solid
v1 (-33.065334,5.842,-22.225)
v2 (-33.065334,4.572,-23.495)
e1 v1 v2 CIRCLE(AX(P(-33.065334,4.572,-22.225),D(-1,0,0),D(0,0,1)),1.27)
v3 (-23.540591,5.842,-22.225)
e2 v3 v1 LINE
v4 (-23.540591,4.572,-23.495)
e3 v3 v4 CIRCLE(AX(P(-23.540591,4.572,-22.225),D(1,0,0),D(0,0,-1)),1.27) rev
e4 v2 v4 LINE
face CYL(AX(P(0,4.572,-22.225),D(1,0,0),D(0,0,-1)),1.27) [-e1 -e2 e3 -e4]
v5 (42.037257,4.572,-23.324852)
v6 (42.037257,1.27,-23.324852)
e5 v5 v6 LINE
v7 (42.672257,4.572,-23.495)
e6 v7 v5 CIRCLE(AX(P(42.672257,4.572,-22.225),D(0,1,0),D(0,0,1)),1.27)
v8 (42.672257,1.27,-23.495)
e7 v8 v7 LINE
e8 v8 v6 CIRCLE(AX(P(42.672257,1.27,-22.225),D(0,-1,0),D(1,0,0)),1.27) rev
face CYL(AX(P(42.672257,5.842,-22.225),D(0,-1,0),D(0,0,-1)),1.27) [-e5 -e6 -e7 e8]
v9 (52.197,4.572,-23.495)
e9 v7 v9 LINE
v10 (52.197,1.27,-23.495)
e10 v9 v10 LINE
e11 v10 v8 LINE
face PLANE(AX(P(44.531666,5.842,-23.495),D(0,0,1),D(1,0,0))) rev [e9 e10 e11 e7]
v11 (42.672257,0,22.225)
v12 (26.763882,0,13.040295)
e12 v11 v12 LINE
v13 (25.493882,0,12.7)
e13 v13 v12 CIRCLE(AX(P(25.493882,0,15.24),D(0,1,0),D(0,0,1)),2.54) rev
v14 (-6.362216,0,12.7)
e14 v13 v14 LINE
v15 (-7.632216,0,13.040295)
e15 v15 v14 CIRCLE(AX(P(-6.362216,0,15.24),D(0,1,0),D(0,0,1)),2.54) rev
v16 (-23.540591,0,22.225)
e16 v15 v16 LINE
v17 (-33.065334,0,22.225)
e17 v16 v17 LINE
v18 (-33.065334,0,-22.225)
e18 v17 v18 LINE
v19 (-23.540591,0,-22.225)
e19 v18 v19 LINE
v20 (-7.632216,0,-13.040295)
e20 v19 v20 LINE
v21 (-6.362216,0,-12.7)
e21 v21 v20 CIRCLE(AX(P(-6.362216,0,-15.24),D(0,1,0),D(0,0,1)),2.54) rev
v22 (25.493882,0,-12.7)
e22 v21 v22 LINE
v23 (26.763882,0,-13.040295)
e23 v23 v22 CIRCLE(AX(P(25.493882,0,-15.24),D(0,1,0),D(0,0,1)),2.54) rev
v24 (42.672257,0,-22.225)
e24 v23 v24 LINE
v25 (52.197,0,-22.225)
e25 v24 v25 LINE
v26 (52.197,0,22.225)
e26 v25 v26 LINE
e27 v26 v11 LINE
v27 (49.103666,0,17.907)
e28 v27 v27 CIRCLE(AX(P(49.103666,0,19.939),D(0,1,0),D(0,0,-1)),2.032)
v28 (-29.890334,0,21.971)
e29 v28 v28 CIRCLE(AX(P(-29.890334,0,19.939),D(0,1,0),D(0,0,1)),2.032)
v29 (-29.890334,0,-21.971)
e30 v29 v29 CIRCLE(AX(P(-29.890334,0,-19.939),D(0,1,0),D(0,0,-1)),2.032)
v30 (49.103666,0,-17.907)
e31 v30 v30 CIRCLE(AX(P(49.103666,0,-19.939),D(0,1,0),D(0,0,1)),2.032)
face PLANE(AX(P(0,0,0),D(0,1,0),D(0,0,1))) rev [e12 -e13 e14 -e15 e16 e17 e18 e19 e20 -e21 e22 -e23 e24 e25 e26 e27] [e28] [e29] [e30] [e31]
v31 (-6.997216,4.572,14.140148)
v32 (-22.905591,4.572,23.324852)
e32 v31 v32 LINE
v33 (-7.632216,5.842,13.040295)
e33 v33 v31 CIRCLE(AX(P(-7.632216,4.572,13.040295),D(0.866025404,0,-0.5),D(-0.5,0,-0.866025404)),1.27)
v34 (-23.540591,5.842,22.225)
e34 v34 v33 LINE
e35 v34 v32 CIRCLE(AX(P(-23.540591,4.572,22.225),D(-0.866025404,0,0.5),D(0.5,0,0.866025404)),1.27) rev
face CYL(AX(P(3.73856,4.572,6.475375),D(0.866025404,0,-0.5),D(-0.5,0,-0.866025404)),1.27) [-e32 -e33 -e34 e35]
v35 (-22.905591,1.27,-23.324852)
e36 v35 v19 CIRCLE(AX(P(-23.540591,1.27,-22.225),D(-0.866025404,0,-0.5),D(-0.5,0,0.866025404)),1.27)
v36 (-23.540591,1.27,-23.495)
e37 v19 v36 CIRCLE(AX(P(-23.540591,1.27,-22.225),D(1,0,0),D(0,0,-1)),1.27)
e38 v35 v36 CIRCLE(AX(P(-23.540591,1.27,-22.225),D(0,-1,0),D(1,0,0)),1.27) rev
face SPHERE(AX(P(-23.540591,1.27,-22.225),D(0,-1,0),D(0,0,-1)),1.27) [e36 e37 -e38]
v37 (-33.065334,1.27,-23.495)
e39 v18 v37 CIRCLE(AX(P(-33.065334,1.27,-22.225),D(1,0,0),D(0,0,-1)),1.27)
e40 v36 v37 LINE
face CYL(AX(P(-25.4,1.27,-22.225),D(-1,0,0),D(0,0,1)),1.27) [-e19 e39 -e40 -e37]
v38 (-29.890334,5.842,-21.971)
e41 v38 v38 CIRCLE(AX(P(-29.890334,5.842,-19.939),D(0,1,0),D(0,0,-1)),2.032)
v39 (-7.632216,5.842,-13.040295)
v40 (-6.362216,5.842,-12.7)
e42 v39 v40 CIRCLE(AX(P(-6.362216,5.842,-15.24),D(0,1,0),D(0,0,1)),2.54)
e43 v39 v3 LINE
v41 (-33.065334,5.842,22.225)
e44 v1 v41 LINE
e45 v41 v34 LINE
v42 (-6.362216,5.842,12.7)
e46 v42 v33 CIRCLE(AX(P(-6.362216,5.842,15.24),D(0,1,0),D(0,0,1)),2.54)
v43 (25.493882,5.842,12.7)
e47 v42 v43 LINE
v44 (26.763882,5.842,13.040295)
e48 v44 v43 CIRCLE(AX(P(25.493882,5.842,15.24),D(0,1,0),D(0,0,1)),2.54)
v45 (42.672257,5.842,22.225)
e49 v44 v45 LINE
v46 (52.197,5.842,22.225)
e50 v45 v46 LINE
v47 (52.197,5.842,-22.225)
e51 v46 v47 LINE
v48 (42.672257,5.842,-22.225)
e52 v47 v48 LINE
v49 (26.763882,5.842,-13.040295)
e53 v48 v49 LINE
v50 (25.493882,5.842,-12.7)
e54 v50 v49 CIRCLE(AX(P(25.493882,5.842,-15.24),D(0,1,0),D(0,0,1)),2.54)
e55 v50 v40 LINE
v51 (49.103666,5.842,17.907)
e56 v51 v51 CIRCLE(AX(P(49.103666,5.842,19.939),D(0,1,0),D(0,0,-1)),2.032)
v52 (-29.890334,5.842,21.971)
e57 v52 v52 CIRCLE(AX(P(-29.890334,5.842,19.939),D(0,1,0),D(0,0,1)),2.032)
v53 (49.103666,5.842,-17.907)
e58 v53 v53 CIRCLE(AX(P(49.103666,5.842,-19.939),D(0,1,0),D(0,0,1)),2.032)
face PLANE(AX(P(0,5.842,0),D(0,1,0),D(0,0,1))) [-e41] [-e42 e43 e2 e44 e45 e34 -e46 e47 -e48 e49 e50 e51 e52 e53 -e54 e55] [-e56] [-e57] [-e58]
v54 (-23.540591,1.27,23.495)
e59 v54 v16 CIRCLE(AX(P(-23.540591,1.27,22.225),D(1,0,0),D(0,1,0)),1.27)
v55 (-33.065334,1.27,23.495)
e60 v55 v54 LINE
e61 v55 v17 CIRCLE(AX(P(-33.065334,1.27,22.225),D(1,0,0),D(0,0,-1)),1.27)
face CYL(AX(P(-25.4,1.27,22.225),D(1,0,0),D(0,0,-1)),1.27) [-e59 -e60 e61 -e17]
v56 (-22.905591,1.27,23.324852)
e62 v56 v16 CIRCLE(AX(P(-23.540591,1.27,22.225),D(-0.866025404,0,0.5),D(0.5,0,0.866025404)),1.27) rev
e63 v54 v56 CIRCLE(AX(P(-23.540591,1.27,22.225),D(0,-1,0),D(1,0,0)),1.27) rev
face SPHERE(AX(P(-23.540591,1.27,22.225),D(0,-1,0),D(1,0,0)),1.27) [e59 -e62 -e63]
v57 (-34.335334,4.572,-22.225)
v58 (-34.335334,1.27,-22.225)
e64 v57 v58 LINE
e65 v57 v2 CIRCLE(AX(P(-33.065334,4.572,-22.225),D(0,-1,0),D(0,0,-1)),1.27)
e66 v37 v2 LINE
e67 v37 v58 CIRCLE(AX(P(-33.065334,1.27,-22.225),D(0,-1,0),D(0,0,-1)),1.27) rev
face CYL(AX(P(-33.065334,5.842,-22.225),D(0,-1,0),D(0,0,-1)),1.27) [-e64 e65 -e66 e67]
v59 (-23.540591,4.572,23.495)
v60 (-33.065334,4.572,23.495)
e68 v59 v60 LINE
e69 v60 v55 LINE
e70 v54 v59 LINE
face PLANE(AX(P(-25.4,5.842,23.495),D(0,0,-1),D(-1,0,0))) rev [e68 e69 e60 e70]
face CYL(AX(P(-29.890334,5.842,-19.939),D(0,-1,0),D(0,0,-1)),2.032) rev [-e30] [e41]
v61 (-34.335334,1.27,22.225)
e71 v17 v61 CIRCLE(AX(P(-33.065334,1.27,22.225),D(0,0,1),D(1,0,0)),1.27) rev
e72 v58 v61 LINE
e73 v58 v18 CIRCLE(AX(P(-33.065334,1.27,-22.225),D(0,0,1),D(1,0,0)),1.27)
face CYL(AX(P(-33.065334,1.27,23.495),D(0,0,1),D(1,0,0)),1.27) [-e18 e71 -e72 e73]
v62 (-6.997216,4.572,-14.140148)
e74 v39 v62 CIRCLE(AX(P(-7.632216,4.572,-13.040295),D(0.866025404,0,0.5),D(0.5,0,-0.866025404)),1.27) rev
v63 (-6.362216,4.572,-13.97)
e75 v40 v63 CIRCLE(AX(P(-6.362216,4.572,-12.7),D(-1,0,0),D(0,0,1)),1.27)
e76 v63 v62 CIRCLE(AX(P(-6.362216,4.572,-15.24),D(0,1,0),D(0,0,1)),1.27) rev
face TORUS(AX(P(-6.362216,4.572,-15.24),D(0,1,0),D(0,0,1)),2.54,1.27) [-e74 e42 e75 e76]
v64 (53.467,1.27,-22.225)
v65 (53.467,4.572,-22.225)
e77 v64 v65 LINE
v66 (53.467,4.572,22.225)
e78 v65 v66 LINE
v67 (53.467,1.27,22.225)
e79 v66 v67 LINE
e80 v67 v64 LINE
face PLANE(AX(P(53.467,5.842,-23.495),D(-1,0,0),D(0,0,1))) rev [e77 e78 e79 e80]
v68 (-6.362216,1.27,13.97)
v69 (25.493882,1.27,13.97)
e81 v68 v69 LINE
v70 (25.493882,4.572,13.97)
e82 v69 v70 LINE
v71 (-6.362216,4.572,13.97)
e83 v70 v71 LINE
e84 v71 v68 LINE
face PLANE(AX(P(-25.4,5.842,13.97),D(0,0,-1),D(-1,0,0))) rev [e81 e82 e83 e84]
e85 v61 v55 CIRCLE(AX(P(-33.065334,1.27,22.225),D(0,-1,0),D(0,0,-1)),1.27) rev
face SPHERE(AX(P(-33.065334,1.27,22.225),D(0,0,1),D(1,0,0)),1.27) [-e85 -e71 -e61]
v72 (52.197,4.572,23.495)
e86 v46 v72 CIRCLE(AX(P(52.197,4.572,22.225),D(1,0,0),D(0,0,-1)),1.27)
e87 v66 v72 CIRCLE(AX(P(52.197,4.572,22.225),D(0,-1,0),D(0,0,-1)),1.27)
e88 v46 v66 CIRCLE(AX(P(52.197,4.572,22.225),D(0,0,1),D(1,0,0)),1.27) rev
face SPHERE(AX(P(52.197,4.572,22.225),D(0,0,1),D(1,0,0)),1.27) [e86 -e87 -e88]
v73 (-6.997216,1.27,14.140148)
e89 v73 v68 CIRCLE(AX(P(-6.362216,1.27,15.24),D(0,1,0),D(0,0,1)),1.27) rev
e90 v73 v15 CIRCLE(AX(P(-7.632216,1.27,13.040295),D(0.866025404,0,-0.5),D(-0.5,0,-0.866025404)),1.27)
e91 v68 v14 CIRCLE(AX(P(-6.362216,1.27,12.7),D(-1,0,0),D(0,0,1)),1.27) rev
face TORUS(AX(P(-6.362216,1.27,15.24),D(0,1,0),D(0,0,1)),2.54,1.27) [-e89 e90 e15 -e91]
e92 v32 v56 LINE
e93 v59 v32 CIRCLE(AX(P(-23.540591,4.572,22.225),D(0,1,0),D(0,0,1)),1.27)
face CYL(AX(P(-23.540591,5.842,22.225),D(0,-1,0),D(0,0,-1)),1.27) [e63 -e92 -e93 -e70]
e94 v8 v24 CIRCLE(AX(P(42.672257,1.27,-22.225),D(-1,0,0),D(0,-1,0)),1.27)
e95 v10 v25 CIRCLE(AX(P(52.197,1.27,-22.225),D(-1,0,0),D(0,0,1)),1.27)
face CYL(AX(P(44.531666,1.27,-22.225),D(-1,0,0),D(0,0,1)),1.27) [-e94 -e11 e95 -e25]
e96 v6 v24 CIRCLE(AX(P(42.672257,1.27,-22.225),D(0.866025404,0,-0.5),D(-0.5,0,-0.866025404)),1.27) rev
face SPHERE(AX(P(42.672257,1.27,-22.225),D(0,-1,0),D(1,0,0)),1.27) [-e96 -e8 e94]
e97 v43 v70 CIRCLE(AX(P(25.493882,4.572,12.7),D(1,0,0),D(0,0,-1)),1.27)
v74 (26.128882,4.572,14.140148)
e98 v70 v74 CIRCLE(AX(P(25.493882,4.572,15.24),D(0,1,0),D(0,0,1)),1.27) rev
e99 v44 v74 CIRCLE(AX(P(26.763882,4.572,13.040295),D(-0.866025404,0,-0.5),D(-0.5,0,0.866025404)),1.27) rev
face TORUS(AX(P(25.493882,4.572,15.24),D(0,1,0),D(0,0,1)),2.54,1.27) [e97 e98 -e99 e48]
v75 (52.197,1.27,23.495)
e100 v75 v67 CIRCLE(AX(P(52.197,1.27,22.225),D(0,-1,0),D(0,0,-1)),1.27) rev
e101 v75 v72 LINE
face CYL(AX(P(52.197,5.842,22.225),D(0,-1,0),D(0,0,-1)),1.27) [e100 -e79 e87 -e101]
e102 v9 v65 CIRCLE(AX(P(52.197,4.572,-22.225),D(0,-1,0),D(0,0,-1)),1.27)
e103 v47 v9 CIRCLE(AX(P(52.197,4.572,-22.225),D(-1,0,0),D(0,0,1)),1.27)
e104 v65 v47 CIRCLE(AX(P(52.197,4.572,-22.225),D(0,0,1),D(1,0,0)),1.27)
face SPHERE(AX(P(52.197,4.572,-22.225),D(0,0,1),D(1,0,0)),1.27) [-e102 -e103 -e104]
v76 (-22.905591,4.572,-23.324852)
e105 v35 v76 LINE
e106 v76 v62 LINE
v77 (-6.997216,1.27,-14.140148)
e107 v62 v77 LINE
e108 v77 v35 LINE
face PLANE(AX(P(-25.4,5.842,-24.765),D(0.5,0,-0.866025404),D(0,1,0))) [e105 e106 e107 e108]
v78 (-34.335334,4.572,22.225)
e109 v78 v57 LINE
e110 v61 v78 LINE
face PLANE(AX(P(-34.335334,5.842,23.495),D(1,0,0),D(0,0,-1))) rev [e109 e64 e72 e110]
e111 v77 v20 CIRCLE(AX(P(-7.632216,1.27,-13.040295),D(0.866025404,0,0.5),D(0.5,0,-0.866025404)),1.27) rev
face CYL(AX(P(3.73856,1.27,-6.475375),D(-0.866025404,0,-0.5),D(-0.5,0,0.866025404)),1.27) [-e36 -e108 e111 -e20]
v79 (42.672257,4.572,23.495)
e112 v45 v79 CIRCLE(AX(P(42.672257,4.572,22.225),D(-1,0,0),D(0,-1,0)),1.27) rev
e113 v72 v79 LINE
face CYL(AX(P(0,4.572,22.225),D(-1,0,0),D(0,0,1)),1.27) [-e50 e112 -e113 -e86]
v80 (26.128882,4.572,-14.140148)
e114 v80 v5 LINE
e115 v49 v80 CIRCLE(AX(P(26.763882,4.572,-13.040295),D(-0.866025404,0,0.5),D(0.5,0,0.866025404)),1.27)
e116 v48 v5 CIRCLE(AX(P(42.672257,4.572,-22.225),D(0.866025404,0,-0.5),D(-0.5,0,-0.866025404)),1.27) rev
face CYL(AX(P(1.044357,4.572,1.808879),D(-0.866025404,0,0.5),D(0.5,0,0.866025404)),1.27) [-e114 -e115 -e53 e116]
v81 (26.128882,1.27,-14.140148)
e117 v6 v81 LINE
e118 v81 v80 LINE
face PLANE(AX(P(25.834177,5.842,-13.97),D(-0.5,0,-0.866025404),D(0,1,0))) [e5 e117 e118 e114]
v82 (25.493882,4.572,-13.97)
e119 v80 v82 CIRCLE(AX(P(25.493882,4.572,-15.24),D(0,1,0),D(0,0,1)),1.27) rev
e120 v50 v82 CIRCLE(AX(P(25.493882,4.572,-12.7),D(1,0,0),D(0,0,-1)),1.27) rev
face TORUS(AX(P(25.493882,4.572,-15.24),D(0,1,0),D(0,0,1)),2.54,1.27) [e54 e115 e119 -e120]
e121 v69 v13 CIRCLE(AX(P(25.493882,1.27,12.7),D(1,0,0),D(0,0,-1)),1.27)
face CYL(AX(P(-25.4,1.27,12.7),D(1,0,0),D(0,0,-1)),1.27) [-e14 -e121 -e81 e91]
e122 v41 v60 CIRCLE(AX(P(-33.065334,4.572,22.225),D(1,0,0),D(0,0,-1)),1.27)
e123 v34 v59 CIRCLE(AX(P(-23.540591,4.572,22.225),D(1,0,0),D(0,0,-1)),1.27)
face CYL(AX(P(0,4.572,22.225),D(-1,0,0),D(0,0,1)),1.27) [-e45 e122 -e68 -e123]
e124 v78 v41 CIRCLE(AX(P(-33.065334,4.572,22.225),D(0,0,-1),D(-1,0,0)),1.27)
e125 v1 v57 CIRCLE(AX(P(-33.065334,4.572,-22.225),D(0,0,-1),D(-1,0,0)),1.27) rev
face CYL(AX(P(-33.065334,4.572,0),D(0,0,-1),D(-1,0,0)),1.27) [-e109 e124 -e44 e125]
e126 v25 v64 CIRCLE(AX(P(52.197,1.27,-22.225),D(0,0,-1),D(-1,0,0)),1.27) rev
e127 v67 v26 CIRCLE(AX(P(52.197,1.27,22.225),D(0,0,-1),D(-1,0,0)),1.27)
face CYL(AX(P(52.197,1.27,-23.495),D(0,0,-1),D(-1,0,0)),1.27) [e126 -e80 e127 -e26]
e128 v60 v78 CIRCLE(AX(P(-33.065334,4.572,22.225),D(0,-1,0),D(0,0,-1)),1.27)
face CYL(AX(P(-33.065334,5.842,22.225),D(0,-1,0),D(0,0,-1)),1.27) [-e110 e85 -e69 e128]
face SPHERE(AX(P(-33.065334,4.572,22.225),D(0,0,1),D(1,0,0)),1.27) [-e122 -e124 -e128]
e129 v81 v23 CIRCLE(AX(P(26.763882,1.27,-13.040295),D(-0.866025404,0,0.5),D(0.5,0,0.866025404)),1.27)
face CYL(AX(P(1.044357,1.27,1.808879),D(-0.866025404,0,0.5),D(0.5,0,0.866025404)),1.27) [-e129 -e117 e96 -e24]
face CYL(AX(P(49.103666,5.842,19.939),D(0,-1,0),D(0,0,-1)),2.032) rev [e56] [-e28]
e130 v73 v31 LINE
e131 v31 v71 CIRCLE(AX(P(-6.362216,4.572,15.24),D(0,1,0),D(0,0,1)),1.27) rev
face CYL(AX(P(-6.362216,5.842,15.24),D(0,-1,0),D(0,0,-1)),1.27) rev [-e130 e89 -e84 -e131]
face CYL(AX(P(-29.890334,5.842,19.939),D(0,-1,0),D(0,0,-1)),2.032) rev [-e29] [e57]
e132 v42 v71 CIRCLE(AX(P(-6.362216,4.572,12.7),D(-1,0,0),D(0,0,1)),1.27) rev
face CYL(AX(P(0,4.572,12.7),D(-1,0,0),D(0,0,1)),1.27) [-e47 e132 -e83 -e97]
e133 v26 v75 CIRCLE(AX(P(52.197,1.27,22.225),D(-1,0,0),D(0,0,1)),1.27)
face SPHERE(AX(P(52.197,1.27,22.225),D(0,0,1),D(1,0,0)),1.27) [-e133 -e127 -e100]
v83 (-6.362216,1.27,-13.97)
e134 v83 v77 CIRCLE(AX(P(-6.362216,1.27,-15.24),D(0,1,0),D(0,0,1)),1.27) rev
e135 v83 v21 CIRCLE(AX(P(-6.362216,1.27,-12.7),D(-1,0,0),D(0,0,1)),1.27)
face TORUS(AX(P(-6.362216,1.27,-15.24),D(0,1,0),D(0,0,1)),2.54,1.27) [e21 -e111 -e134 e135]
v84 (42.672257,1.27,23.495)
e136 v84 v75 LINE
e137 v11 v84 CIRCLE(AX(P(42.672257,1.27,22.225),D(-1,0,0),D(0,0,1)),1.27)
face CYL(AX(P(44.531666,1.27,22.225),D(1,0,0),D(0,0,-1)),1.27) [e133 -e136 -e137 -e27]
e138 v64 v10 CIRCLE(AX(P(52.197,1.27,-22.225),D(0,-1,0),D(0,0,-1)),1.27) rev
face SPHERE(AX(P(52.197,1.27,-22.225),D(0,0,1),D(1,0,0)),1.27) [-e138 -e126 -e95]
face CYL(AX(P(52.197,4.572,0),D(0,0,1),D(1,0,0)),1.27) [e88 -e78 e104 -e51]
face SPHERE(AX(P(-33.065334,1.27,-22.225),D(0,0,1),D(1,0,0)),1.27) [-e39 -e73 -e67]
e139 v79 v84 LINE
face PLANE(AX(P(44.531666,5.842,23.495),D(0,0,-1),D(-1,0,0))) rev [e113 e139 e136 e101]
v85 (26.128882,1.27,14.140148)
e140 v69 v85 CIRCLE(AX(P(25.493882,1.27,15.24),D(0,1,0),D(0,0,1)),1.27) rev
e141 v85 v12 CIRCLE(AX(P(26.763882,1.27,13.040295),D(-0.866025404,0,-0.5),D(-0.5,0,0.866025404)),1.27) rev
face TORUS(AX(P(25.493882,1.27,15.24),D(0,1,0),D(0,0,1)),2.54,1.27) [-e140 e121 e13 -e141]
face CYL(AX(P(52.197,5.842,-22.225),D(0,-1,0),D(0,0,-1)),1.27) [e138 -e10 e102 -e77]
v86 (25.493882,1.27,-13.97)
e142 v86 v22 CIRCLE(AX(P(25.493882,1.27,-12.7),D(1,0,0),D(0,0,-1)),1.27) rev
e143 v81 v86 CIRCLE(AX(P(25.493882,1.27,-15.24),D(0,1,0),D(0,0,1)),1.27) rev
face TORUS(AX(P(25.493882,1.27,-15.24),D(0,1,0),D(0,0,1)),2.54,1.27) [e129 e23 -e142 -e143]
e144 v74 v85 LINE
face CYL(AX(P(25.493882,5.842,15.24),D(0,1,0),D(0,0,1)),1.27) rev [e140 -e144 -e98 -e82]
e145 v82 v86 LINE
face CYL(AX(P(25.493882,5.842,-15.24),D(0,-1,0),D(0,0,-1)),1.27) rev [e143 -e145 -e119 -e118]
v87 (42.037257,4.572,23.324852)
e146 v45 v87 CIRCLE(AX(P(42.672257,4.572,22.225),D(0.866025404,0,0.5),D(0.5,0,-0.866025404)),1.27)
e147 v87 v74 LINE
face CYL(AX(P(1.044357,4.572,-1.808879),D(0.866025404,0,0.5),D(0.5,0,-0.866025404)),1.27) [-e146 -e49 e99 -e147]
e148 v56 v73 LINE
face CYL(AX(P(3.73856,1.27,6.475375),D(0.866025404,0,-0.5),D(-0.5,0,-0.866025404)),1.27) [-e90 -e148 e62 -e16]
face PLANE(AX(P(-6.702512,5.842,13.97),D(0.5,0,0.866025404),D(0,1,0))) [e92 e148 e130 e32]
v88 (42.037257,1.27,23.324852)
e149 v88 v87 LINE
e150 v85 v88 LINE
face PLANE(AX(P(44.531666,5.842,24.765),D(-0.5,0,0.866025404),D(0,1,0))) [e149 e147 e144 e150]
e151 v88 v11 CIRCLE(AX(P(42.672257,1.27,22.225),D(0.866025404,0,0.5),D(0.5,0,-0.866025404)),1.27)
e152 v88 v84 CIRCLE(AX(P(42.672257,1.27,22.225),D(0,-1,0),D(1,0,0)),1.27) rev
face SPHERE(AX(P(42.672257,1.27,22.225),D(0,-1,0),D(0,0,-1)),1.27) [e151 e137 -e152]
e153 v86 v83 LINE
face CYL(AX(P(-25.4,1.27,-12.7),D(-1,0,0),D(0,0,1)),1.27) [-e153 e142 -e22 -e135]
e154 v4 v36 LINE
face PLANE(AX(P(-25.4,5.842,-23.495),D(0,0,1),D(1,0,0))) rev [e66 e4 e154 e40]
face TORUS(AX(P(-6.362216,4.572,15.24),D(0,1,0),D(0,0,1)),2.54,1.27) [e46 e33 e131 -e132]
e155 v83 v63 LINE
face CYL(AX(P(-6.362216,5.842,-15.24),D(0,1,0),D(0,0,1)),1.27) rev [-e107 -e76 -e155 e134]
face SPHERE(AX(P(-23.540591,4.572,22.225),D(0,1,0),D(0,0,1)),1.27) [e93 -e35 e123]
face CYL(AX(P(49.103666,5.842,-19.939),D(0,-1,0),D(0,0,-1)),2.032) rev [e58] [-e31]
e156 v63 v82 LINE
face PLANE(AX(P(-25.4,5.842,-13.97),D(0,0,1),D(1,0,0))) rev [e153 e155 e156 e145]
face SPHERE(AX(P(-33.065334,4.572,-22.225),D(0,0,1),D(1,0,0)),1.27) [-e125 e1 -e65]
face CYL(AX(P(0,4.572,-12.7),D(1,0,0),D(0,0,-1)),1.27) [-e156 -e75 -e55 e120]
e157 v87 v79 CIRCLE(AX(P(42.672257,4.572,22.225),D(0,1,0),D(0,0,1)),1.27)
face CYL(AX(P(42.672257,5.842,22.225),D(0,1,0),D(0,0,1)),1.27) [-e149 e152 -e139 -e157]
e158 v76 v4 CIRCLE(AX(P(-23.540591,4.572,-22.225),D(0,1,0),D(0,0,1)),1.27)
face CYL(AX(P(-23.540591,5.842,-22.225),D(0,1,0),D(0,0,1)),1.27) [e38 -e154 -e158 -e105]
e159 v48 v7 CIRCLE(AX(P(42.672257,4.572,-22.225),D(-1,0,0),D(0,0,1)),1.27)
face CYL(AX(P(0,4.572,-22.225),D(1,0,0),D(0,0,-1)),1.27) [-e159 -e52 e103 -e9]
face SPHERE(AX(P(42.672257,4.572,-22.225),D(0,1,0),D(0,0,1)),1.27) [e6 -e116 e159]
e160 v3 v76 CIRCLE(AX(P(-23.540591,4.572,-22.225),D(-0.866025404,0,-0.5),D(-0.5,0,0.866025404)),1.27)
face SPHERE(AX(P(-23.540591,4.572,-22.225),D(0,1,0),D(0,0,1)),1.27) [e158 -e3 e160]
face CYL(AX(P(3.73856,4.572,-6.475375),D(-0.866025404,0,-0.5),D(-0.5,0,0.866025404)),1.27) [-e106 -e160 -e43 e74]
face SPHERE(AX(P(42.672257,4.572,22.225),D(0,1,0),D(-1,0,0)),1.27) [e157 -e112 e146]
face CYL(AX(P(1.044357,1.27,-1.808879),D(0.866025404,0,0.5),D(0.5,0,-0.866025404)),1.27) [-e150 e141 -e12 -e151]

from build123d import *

# Parameters (mm, degrees)
SKETCH3_R           = 2.032000000000001
BOSS_EXTRUDE1_DEPTH = 5.842
FILLET1_R           = 1.27
CHAMFER1_SIZE       = 18.697488468
CHAMFER1_SIZE_2     = 10.795
FILLET2_R           = 1.27


with BuildPart() as part:
    # Sketch3 → Boss-Extrude1 (new body)
    with BuildSketch(Plane(origin=(0, 0, 0), x_dir=(1, 0, 0), z_dir=(0, 1, 0))):
        Polygon((44.531665591536154, -23.494999999999987), (53.467, -23.49499999999999), (53.467, 23.49499999999999), (44.531665591536154, 23.494999999999987), (44.531665591536154, 13.97), (-25.399999999999977, 13.97), (-25.399999999999977, 23.494999999999997), (-34.33533440846382, 23.494999999999997), (-34.33533440846385, -23.494999999999997), (-25.39999999999999, -23.494999999999997), (-25.39999999999999, -13.97), (44.531665591536154, -13.97), align=None)
        with Locations(Location((49.10366559153615, 19.939, 0), (0, 0, 270))):
            Circle(SKETCH3_R, mode=Mode.SUBTRACT)
        with Locations(Location((49.10366559153615, -19.939, 0), (0, 0, 90))):
            Circle(SKETCH3_R, mode=Mode.SUBTRACT)
        with Locations(Location((-29.890334408463843, -19.939000000000004, 0), (0, 0, 270))):
            Circle(SKETCH3_R, mode=Mode.SUBTRACT)
        with Locations(Location((-29.890334408463843, 19.939000000000004, 0), (0, 0, 90))):
            Circle(SKETCH3_R, mode=Mode.SUBTRACT)
    extrude(amount=BOSS_EXTRUDE1_DEPTH)

    # Fillet1
    fillet1_edges = [part.edges().sort_by_distance(p)[0] for p in [
        (-34.33533440846384, 5.842, 0),
        (53.467, 0, 0),
        (-34.33533440846384, 0, 0),
        (53.467, 2.921, -23.49499999999999),
        (53.467, 2.921, 23.49499999999999),
        (-34.33533440846385, 2.921, 23.494999999999997),
        (-34.33533440846382, 2.921, -23.494999999999997),
        (53.467, 5.842, 0),
    ]]
    fillet(fillet1_edges, radius=FILLET1_R)

    # Chamfer1
    # the kernel refuses this chamfer: 18.697488468, 10.795 mm, written as the material it adds along each edge
    with BuildSketch(Plane(origin=(-25.399999999999977, 0, -13.97), x_dir=(0.999813220622208, 0, 0.019326765612700643), z_dir=(0, 1, 0))) as chamfer1_piece_1_section:
        Polygon((CHAMFER1_SIZE * 0.999813220606, CHAMFER1_SIZE * 0.0193267656124), (-CHAMFER1_SIZE_2 * 0.0193267656127, CHAMFER1_SIZE_2 * 0.999813220622), (0, 0), align=None)
    chamfer1_piece_1 = extrude(amount=5.842, mode=Mode.PRIVATE)
    chamfer1_piece_1 = split(chamfer1_piece_1, bisect_by=Plane(origin=(-18.979428643974416, 2.920999999999999, -23.494999999999997), z_dir=(0, 0, 1)), keep=Keep.TOP, mode=Mode.PRIVATE)
    add(chamfer1_piece_1)
    with BuildSketch(Plane(origin=(44.531665591536154, 0, -13.97), x_dir=(0.05789386240267167, 0, -0.9983227437537926), z_dir=(0, 1, 0))) as chamfer1_piece_2_section:
        Polygon((CHAMFER1_SIZE_2 * 0.998322743754, CHAMFER1_SIZE_2 * 0.0578938624027), (-CHAMFER1_SIZE * 0.0578938624018, CHAMFER1_SIZE * 0.998322743738), (0, 0), align=None)
    chamfer1_piece_2 = extrude(amount=5.842, mode=Mode.PRIVATE)
    chamfer1_piece_2 = split(chamfer1_piece_2, bisect_by=Plane(origin=(38.11109423551069, 2.9210000000000003, -23.494999999999983), z_dir=(4e-16, 0, 1)), keep=Keep.TOP, mode=Mode.PRIVATE)
    add(chamfer1_piece_2)
    with BuildSketch(Plane(origin=(44.531665591536154, 0, 13.97), x_dir=(0.05789386240267167, 0, 0.9983227437537926), z_dir=(0, 1, 0))) as chamfer1_piece_3_section:
        Polygon((CHAMFER1_SIZE_2 * 0.998322743754, -CHAMFER1_SIZE_2 * 0.0578938624027), (-CHAMFER1_SIZE * 0.0578938624018, -CHAMFER1_SIZE * 0.998322743738), (0, 0), align=None)
    chamfer1_piece_3 = extrude(amount=5.842, mode=Mode.PRIVATE)
    chamfer1_piece_3 = split(chamfer1_piece_3, bisect_by=Plane(origin=(38.1110942355107, 2.921, 23.494999999999983), z_dir=(4e-16, 0, -1)), keep=Keep.TOP, mode=Mode.PRIVATE)
    add(chamfer1_piece_3)
    with BuildSketch(Plane(origin=(-25.39999999999999, 0, 13.97), x_dir=(0.999813220622208, 0, -0.019326765612700643), z_dir=(0, 1, 0))) as chamfer1_piece_4_section:
        Polygon((CHAMFER1_SIZE * 0.999813220606, -CHAMFER1_SIZE * 0.0193267656124), (-CHAMFER1_SIZE_2 * 0.0193267656127, -CHAMFER1_SIZE_2 * 0.999813220622), (0, 0), align=None)
    chamfer1_piece_4 = extrude(amount=5.842, mode=Mode.PRIVATE)
    chamfer1_piece_4 = split(chamfer1_piece_4, bisect_by=Plane(origin=(-18.979428643974433, 2.9209999999999985, 23.494999999999997), z_dir=(0, 0, -1)), keep=Keep.TOP, mode=Mode.PRIVATE)
    add(chamfer1_piece_4)

    # Fillet2
    # the kernel refuses this fillet: 1.27 mm, written as the material it adds along each edge
    with BuildSketch(Plane(origin=(25.834177123831726, 0, -13.970000000005081), x_dir=(0.8660254037845168, 0, -0.4999999999998646), z_dir=(0, 1, 0))) as fillet2_piece_1:
        with BuildLine():
            CenterArc((FILLET2_R * 0.267949192431, FILLET2_R), FILLET2_R, 240.00000000000912, 29.999999999991417)
            Line((-FILLET2_R * 0.232050807569, FILLET2_R * 0.133974596215), (0, 0))
            Line((0, 0), (FILLET2_R * 0.267949192431, 0))
        make_face()
    extrude(amount=5.842)
    with BuildSketch(Plane(origin=(-6.702511532303099, 0, -13.969999999994567), x_dir=(1.0, 0, -1.5968110012338276e-11), z_dir=(0, 1, 0))) as fillet2_piece_2:
        with BuildLine():
            CenterArc((FILLET2_R * 0.267949192447, FILLET2_R), FILLET2_R, 239.9999999991839, 29.999999999901206)
            Line((-FILLET2_R * 0.232050807565, FILLET2_R * 0.133974596223), (0, 0))
            Line((0, 0), (FILLET2_R * 0.267949192431, 0))
        make_face()
    extrude(amount=5.842)
    with BuildSketch(Plane(origin=(-6.702511532303099, 0, 13.969999999994567), x_dir=(-0.8660254037842282, 0, 0.5000000000003643), z_dir=(0, 1, 0))) as fillet2_piece_3:
        with BuildLine():
            CenterArc((FILLET2_R * 0.267949192431, FILLET2_R), FILLET2_R, 239.9999999999759, 30.000000000023817)
            Line((-FILLET2_R * 0.232050807569, FILLET2_R * 0.133974596216), (0, 0))
            Line((0, 0), (FILLET2_R * 0.267949192431, -1e-17))
        make_face()
    extrude(amount=5.842)
    with BuildSketch(Plane(origin=(25.834177123831726, 0, 13.970000000005081), x_dir=(-1.0, 0, -1.4929321554540515e-11), z_dir=(0, 1, 0))) as fillet2_piece_4:
        with BuildLine():
            CenterArc((FILLET2_R * 0.267949192416, FILLET2_R), FILLET2_R, 240.00000000074962, 30.00000000010573)
            Line((-FILLET2_R * 0.232050807573, FILLET2_R * 0.133974596209), (0, 0))
            Line((0, 0), (FILLET2_R * 0.267949192431, 0))
        make_face()
    extrude(amount=5.842)
    # the kernel refuses this fillet: 1.27 mm, written as the material it takes off along each edge
    with BuildSketch(Plane(origin=(-33.065334408463855, 4.571999999999999, 22.225), x_dir=(0, 1, 0), z_dir=(0, 0, 1))) as fillet2_2_piece_1_section:
        Polygon((0, 0), (FILLET2_R, 0), (FILLET2_R, FILLET2_R), (0, FILLET2_R), align=None)
    fillet2_2_piece_1 = extrude(amount=FILLET2_R, mode=Mode.PRIVATE)
    fillet2_2_piece_1 = fillet2_2_piece_1 - Plane(origin=(-33.065334408463855, 4.571999999999999, 22.225), x_dir=(0.7071067811865475, -0.7071067811865475, 0), z_dir=(0, 0, 1)) * Sphere(FILLET2_R, mode=Mode.PRIVATE)
    add(fillet2_2_piece_1, mode=Mode.SUBTRACT)
    with BuildSketch(Plane(origin=(-33.06533440846385, 1.27, 22.225), x_dir=(0, 0, 1), z_dir=(0, -1, 0))) as fillet2_2_piece_2_section:
        Polygon((0, 0), (FILLET2_R, 0), (FILLET2_R, FILLET2_R), (-7.7e-16, FILLET2_R), align=None)
    fillet2_2_piece_2 = extrude(amount=FILLET2_R, mode=Mode.PRIVATE)
    fillet2_2_piece_2 = fillet2_2_piece_2 - Plane(origin=(-33.06533440846385, 1.27, 22.225), x_dir=(0.7071067811865477, 0, -0.7071067811865474), z_dir=(0, -1, 0)) * Sphere(FILLET2_R, mode=Mode.PRIVATE)
    add(fillet2_2_piece_2, mode=Mode.SUBTRACT)
    with BuildSketch(Plane(origin=(-33.06533440846382, 4.571999999999999, -22.225), x_dir=(0, 0, -1), z_dir=(0, 1, 0))) as fillet2_2_piece_3_section:
        Polygon((0, 0), (FILLET2_R, 0), (FILLET2_R, FILLET2_R), (7.7e-16, FILLET2_R), align=None)
    fillet2_2_piece_3 = extrude(amount=FILLET2_R, mode=Mode.PRIVATE)
    fillet2_2_piece_3 = fillet2_2_piece_3 - Plane(origin=(-33.06533440846382, 4.571999999999999, -22.225), x_dir=(0.7071067811865472, 0, 0.7071067811865477), z_dir=(0, 1, 0)) * Sphere(FILLET2_R, mode=Mode.PRIVATE)
    add(fillet2_2_piece_3, mode=Mode.SUBTRACT)
    with BuildSketch(Plane(origin=(-33.06533440846382, 1.27, -22.225), x_dir=(0, 0, -1), z_dir=(0, -1, 0))) as fillet2_2_piece_4_section:
        Polygon((0, 0), (FILLET2_R, 0), (FILLET2_R, -FILLET2_R), (7.7e-16, -FILLET2_R), align=None)
    fillet2_2_piece_4 = extrude(amount=FILLET2_R, mode=Mode.PRIVATE)
    fillet2_2_piece_4 = fillet2_2_piece_4 - Plane(origin=(-33.06533440846382, 1.27, -22.225), x_dir=(0.7071067811865472, 0, 0.7071067811865477), z_dir=(0, -1, 0)) * Sphere(FILLET2_R, mode=Mode.PRIVATE)
    add(fillet2_2_piece_4, mode=Mode.SUBTRACT)
    with BuildSketch(Plane(origin=(52.196999999999996, 4.571999999999999, 22.225), x_dir=(0, 0, 1), z_dir=(0, 1, 0))) as fillet2_2_piece_5_section:
        Polygon((0, 0), (FILLET2_R, 0), (FILLET2_R, FILLET2_R), (0, FILLET2_R), align=None)
    fillet2_2_piece_5 = extrude(amount=FILLET2_R, mode=Mode.PRIVATE)
    fillet2_2_piece_5 = fillet2_2_piece_5 - Plane(origin=(52.196999999999996, 4.571999999999999, 22.225), x_dir=(-0.7071067811865475, 0, -0.7071067811865475), z_dir=(0, 1, 0)) * Sphere(FILLET2_R, mode=Mode.PRIVATE)
    add(fillet2_2_piece_5, mode=Mode.SUBTRACT)
    with BuildSketch(Plane(origin=(52.196999999999996, 1.27, 22.225), x_dir=(0, 0, 1), z_dir=(0, -1, 0))) as fillet2_2_piece_6_section:
        Polygon((0, 0), (FILLET2_R, 0), (FILLET2_R, -FILLET2_R), (0, -FILLET2_R), align=None)
    fillet2_2_piece_6 = extrude(amount=FILLET2_R, mode=Mode.PRIVATE)
    fillet2_2_piece_6 = fillet2_2_piece_6 - Plane(origin=(52.196999999999996, 1.27, 22.225), x_dir=(-0.7071067811865475, 0, -0.7071067811865475), z_dir=(0, -1, 0)) * Sphere(FILLET2_R, mode=Mode.PRIVATE)
    add(fillet2_2_piece_6, mode=Mode.SUBTRACT)
    with BuildSketch(Plane(origin=(52.196999999999996, 4.571999999999999, -22.225), x_dir=(0, 0, -1), z_dir=(0, 1, 0))) as fillet2_2_piece_7_section:
        Polygon((0, 0), (FILLET2_R, 0), (FILLET2_R, -FILLET2_R), (0, -FILLET2_R), align=None)
    fillet2_2_piece_7 = extrude(amount=FILLET2_R, mode=Mode.PRIVATE)
    fillet2_2_piece_7 = fillet2_2_piece_7 - Plane(origin=(52.196999999999996, 4.571999999999999, -22.225), x_dir=(-0.7071067811865475, 0, 0.7071067811865475), z_dir=(0, 1, 0)) * Sphere(FILLET2_R, mode=Mode.PRIVATE)
    add(fillet2_2_piece_7, mode=Mode.SUBTRACT)
    with BuildSketch(Plane(origin=(52.196999999999996, 1.27, -22.225), x_dir=(0, 0, -1), z_dir=(0, -1, 0))) as fillet2_2_piece_8_section:
        Polygon((0, 0), (FILLET2_R, 0), (FILLET2_R, FILLET2_R), (0, FILLET2_R), align=None)
    fillet2_2_piece_8 = extrude(amount=FILLET2_R, mode=Mode.PRIVATE)
    fillet2_2_piece_8 = fillet2_2_piece_8 - Plane(origin=(52.196999999999996, 1.27, -22.225), x_dir=(-0.7071067811865475, 0, 0.7071067811865475), z_dir=(0, -1, 0)) * Sphere(FILLET2_R, mode=Mode.PRIVATE)
    add(fillet2_2_piece_8, mode=Mode.SUBTRACT)
    with BuildSketch(Plane(origin=(42.67225654030955, 1.27, 22.224999999999998), x_dir=(0, 0, 1), z_dir=(0, -1, 0))) as fillet2_2_piece_9_section:
        Polygon((0, 0), (FILLET2_R, 0), (FILLET2_R, FILLET2_R * 0.267949192431), (FILLET2_R * 0.866025403785, FILLET2_R * 0.5), align=None)
    fillet2_2_piece_9 = extrude(amount=FILLET2_R, mode=Mode.PRIVATE)
    fillet2_2_piece_9 = fillet2_2_piece_9 - Plane(origin=(42.67225654030955, 1.27, 22.224999999999998), x_dir=(0.2588190451024496, 0, -0.9659258262890873), z_dir=(0, -1, 0)) * Sphere(FILLET2_R, mode=Mode.PRIVATE)
    add(fillet2_2_piece_9, mode=Mode.SUBTRACT)
    with BuildSketch(Plane(origin=(-23.54059094877809, 1.27, -22.225), x_dir=(0, 0, -1), z_dir=(0, -1, 0))) as fillet2_2_piece_10_section:
        Polygon((0, 0), (FILLET2_R, 0), (FILLET2_R, FILLET2_R * 0.267949192431), (FILLET2_R * 0.866025403784, FILLET2_R * 0.5), align=None)
    fillet2_2_piece_10 = extrude(amount=FILLET2_R, mode=Mode.PRIVATE)
    fillet2_2_piece_10 = fillet2_2_piece_10 - Plane(origin=(-23.54059094877809, 1.27, -22.225), x_dir=(-0.2588190451027209, 0, 0.9659258262890146), z_dir=(0, -1, 0)) * Sphere(FILLET2_R, mode=Mode.PRIVATE)
    add(fillet2_2_piece_10, mode=Mode.SUBTRACT)
    with BuildSketch(Plane(origin=(42.67225654030955, 4.571999999999999, 22.224999999999998), x_dir=(0, 0, 1), z_dir=(0, 1, 0))) as fillet2_2_piece_11_section:
        Polygon((0, 0), (FILLET2_R, 0), (FILLET2_R, -FILLET2_R * 0.267949192431), (FILLET2_R * 0.866025403785, -FILLET2_R * 0.5), align=None)
    fillet2_2_piece_11 = extrude(amount=FILLET2_R, mode=Mode.PRIVATE)
    fillet2_2_piece_11 = fillet2_2_piece_11 - Plane(origin=(42.67225654030955, 4.571999999999999, 22.224999999999998), x_dir=(0.2588190451024496, 0, -0.9659258262890873), z_dir=(0, 1, 0)) * Sphere(FILLET2_R, mode=Mode.PRIVATE)
    add(fillet2_2_piece_11, mode=Mode.SUBTRACT)
    with BuildSketch(Plane(origin=(42.67225654030955, 1.27, -22.225000000000016), x_dir=(0, 0, -1), z_dir=(0, -1, 0))) as fillet2_2_piece_12_section:
        Polygon((0, 0), (FILLET2_R, 0), (FILLET2_R, -FILLET2_R * 0.267949192431), (FILLET2_R * 0.866025403785, -FILLET2_R * 0.5), align=None)
    fillet2_2_piece_12 = extrude(amount=FILLET2_R, mode=Mode.PRIVATE)
    fillet2_2_piece_12 = fillet2_2_piece_12 - Plane(origin=(42.67225654030955, 1.27, -22.225000000000016), x_dir=(0.2588190451024496, 0, 0.9659258262890873), z_dir=(0, -1, 0)) * Sphere(FILLET2_R, mode=Mode.PRIVATE)
    add(fillet2_2_piece_12, mode=Mode.SUBTRACT)
    with BuildSketch(Plane(origin=(42.67225654030953, 4.571999999999999, -22.225), x_dir=(-0.4999999999998724, 0, -0.8660254037845124), z_dir=(0, 1, 0))) as fillet2_2_piece_13_section:
        Polygon((0, 0), (FILLET2_R, 3e-17), (FILLET2_R, -FILLET2_R * 0.267949192431), (FILLET2_R * 0.866025403785, -FILLET2_R * 0.5), align=None)
    fillet2_2_piece_13 = extrude(amount=FILLET2_R, mode=Mode.PRIVATE)
    fillet2_2_piece_13 = fillet2_2_piece_13 - Plane(origin=(42.67225654030953, 4.571999999999999, -22.225), x_dir=(0.2588190451024496, 0, 0.9659258262890873), z_dir=(0, 1, 0)) * Sphere(FILLET2_R, mode=Mode.PRIVATE)
    add(fillet2_2_piece_13, mode=Mode.SUBTRACT)
    with BuildSketch(Plane(origin=(-23.54059094877809, 1.27, 22.225), x_dir=(0, 0, 1), z_dir=(0, -1, 0))) as fillet2_2_piece_14_section:
        Polygon((0, 0), (FILLET2_R, 0), (FILLET2_R, -FILLET2_R * 0.267949192431), (FILLET2_R * 0.866025403784, -FILLET2_R * 0.5), align=None)
    fillet2_2_piece_14 = extrude(amount=FILLET2_R, mode=Mode.PRIVATE)
    fillet2_2_piece_14 = fillet2_2_piece_14 - Plane(origin=(-23.54059094877809, 1.27, 22.225), x_dir=(-0.2588190451027209, 0, -0.9659258262890146), z_dir=(0, -1, 0)) * Sphere(FILLET2_R, mode=Mode.PRIVATE)
    add(fillet2_2_piece_14, mode=Mode.SUBTRACT)
    with BuildSketch(Plane(origin=(-23.54059094877809, 4.571999999999999, 22.225), x_dir=(0.5000000000003589, 0, 0.8660254037842315), z_dir=(0, 1, 0))) as fillet2_2_piece_15_section:
        Polygon((0, 0), (FILLET2_R, 2e-17), (FILLET2_R, -FILLET2_R * 0.267949192431), (FILLET2_R * 0.866025403784, -FILLET2_R * 0.5), align=None)
    fillet2_2_piece_15 = extrude(amount=FILLET2_R, mode=Mode.PRIVATE)
    fillet2_2_piece_15 = fillet2_2_piece_15 - Plane(origin=(-23.54059094877809, 4.571999999999999, 22.225), x_dir=(-0.2588190451027209, 0, -0.9659258262890146), z_dir=(0, 1, 0)) * Sphere(FILLET2_R, mode=Mode.PRIVATE)
    add(fillet2_2_piece_15, mode=Mode.SUBTRACT)
    with BuildSketch(Plane(origin=(-23.540590948778096, 4.571999999999999, -22.225000000000016), x_dir=(0, 0, -1), z_dir=(0, 1, 0))) as fillet2_2_piece_16_section:
        Polygon((0, 0), (FILLET2_R, 0), (FILLET2_R, -FILLET2_R * 0.267949192431), (FILLET2_R * 0.866025403784, -FILLET2_R * 0.5), align=None)
    fillet2_2_piece_16 = extrude(amount=FILLET2_R, mode=Mode.PRIVATE)
    fillet2_2_piece_16 = fillet2_2_piece_16 - Plane(origin=(-23.540590948778096, 4.571999999999999, -22.225000000000016), x_dir=(-0.2588190451027209, 0, 0.9659258262890146), z_dir=(0, 1, 0)) * Sphere(FILLET2_R, mode=Mode.PRIVATE)
    add(fillet2_2_piece_16, mode=Mode.SUBTRACT)
    with BuildSketch(Plane(origin=(52.196999999999996, -2.2e-16, 23.49499999999999), x_dir=(-1.08e-15, 1.7e-16, -1), z_dir=(-1, 2e-17, 1.08e-15))) as fillet2_2_piece_17:
        with BuildLine():
            CenterArc((FILLET2_R, -FILLET2_R), FILLET2_R, 90.00000000000001, 89.99999999999999)
            Line((3.77e-15, -FILLET2_R), (0, 0))
            Line((0, 0), (FILLET2_R, 0))
        make_face()
    extrude(amount=9.524743459690463, mode=Mode.SUBTRACT)
    with BuildSketch(Plane(origin=(-33.06533440846382, -2.2e-16, -23.494999999999997), x_dir=(0, 1.7e-16, 1), z_dir=(1, 2e-17, 0))) as fillet2_2_piece_18:
        with BuildLine():
            CenterArc((FILLET2_R, -FILLET2_R), FILLET2_R, 90.00000000000001, 89.99999999999999)
            Line((-1.044e-14, -FILLET2_R), (0, 0))
            Line((0, 0), (FILLET2_R, 0))
        make_face()
    extrude(amount=9.52474345968573, mode=Mode.SUBTRACT)
    with BuildSketch(Plane(origin=(42.67225654030953, 5.842, 23.495), x_dir=(-1.08e-15, -7e-16, -1), z_dir=(1, 0, -1.08e-15))) as fillet2_2_piece_19:
        with BuildLine():
            CenterArc((FILLET2_R, -FILLET2_R), FILLET2_R, 90.00000000000004, 89.99999999999996)
            Line((4.44e-15, -FILLET2_R), (0, 0))
            Line((0, 0), (FILLET2_R, 0))
        make_face()
    extrude(amount=9.524743459690463, mode=Mode.SUBTRACT)
    with BuildSketch(Plane(origin=(42.67225654030953, -1e-17, -23.495), x_dir=(-1.08e-15, 1e-17, 1), z_dir=(1, -2e-17, 1.08e-15))) as fillet2_2_piece_20:
        with BuildLine():
            CenterArc((FILLET2_R, -FILLET2_R), FILLET2_R, 90, 90)
            Line((-1.42e-14, -FILLET2_R), (0, 0))
            Line((0, 0), (FILLET2_R, 0))
        make_face()
    extrude(amount=9.524743459690463, mode=Mode.SUBTRACT)
    with BuildSketch(Plane(origin=(52.196999999999996, 5.842, -23.49499999999999), x_dir=(-1.08e-15, -7e-16, 1), z_dir=(-1, 0, -1.08e-15))) as fillet2_2_piece_21:
        with BuildLine():
            CenterArc((FILLET2_R, -FILLET2_R), FILLET2_R, 90.00000000000004, 89.99999999999996)
            Line((-9.77e-15, -FILLET2_R), (0, 0))
            Line((0, 0), (FILLET2_R, 0))
        make_face()
    extrude(amount=9.524743459690477, mode=Mode.SUBTRACT)
    with BuildSketch(Plane(origin=(-23.540590948778085, -1e-17, 23.494999999999997), x_dir=(0, 1e-17, -1), z_dir=(-1, -2e-17, 0))) as fillet2_2_piece_22:
        with BuildLine():
            CenterArc((FILLET2_R, -FILLET2_R), FILLET2_R, 90, 90)
            Line((3.56e-15, -FILLET2_R), (0, 0))
            Line((0, 0), (FILLET2_R, 0))
        make_face()
    extrude(amount=9.524743459685762, mode=Mode.SUBTRACT)
    with BuildSketch(Plane(origin=(-23.54059094877809, 5.842, 23.494999999999997), x_dir=(-9e-17, -1, 2.8e-15), z_dir=(-1, 9e-17, 0))) as fillet2_2_piece_23:
        with BuildLine():
            CenterArc((FILLET2_R, -FILLET2_R), FILLET2_R, 89.99999999999984, 90.00000000000028)
            Line((-4.44e-15, -FILLET2_R), (0, 0))
            Line((0, 0), (FILLET2_R, 0))
        make_face()
    extrude(amount=9.524743459685759, mode=Mode.SUBTRACT)
    with BuildSketch(Plane(origin=(25.4938816494443, 0, -13.97), x_dir=(0, 0, 1), z_dir=(-1, 0, 0))) as fillet2_2_piece_24:
        with BuildLine():
            CenterArc((FILLET2_R, FILLET2_R), FILLET2_R, 180, 90)
            Line((-8.88e-15, FILLET2_R), (0, 0))
            Line((0, 0), (FILLET2_R, 0))
        make_face()
    extrude(amount=31.85609770735959, mode=Mode.SUBTRACT)
    with BuildSketch(Plane(origin=(25.4938816494443, 5.842, -13.97), x_dir=(0, -7e-16, 1), z_dir=(-1, 0, 0))) as fillet2_2_piece_25:
        with BuildLine():
            CenterArc((FILLET2_R, -FILLET2_R), FILLET2_R, 90.00000000000004, 89.99999999999996)
            Line((-7.99e-15, -FILLET2_R), (0, 0))
            Line((0, 0), (FILLET2_R, 0))
        make_face()
    extrude(amount=31.85609770735959, mode=Mode.SUBTRACT)
    with BuildSketch(Plane(origin=(-6.36221605791529, 0, 13.97), x_dir=(0, 0, -1), z_dir=(1, 0, 0))) as fillet2_2_piece_26:
        with BuildLine():
            CenterArc((FILLET2_R, FILLET2_R), FILLET2_R, 180, 90)
            Line((1.78e-15, FILLET2_R), (0, 0))
            Line((0, 0), (FILLET2_R, 0))
        make_face()
    extrude(amount=31.856097707359595, mode=Mode.SUBTRACT)
    with BuildSketch(Plane(origin=(-6.36221605791529, 5.842, 13.97), x_dir=(0, -7e-16, -1), z_dir=(1, 0, 0))) as fillet2_2_piece_27:
        with BuildLine():
            CenterArc((FILLET2_R, -FILLET2_R), FILLET2_R, 90.00000000000004, 89.99999999999996)
            Line((2.66e-15, -FILLET2_R), (0, 0))
            Line((0, 0), (FILLET2_R, 0))
        make_face()
    extrude(amount=31.856097707359595, mode=Mode.SUBTRACT)
    with BuildSketch(Plane(origin=(-23.200295474390288, 1.2700000000000002, -23.495000000000005), x_dir=(-1, 0, 1.044e-14), z_dir=(0, 1, 0))) as fillet2_2_piece_28:
        with BuildLine():
            CenterArc((FILLET2_R * 0.267949192431, FILLET2_R), FILLET2_R, 239.999999999976, 30.00000000002342)
            Line((-FILLET2_R * 0.232050807569, FILLET2_R * 0.133974596216), (0, 0))
            Line((0, 0), (FILLET2_R * 0.267949192431, 0))
        make_face()
    extrude(amount=3.3019999999999987, mode=Mode.SUBTRACT)
    with BuildSketch(Plane(origin=(-6.997216057915747, 0, -14.140147737188592), x_dir=(-0.5000000000003588, 0, 0.8660254037842313), z_dir=(-0.8660254037842315, 0, -0.5000000000003589))) as fillet2_2_piece_29:
        with BuildLine():
            CenterArc((FILLET2_R, FILLET2_R), FILLET2_R, 180, 90)
            Line((-8.82e-15, FILLET2_R), (0, 0))
            Line((0, 0), (FILLET2_R, 0))
        make_face()
    extrude(amount=18.369409051221574, mode=Mode.SUBTRACT)
    with BuildSketch(Plane(origin=(-33.06533440846382, 5.8420000000000005, -23.494999999999997), x_dir=(0, -1.4e-15, 1), z_dir=(1, -9e-17, 0))) as fillet2_2_piece_30:
        with BuildLine():
            CenterArc((FILLET2_R, FILLET2_R), FILLET2_R, 180, 89.99999999999989)
            Line((-8.88e-15, FILLET2_R), (0, 0))
            Line((0, 0), (FILLET2_R, 0))
        make_face()
    extrude(amount=9.524743459685723, mode=Mode.SUBTRACT)
    with BuildSketch(Plane(origin=(-6.997216057915747, 5.842, -14.140147737188592), x_dir=(-0.5000000000003588, 0, 0.8660254037842313), z_dir=(-0.8660254037842315, 0, -0.5000000000003589))) as fillet2_2_piece_31:
        with BuildLine():
            CenterArc((FILLET2_R, -FILLET2_R), FILLET2_R, 90.00000000000004, 89.99999999999996)
            Line((-7.93e-15, -FILLET2_R), (0, 0))
            Line((0, 0), (FILLET2_R, 0))
        make_face()
    extrude(amount=18.369409051221584, mode=Mode.SUBTRACT)
    with BuildSketch(Plane(origin=(42.0372565403097, 0, -23.324852262806335), x_dir=(0.4999999999998724, 0, 0.8660254037845124), z_dir=(-0.8660254037845124, 0, 0.4999999999998724))) as fillet2_2_piece_32:
        with BuildLine():
            CenterArc((FILLET2_R, FILLET2_R), FILLET2_R, 180, 90)
            Line((-6.63e-15, FILLET2_R), (0, 0))
            Line((0, 0), (FILLET2_R, 0))
        make_face()
    extrude(amount=18.369409051219872, mode=Mode.SUBTRACT)
    with BuildSketch(Plane(origin=(42.33196106592211, 4.571999999999999, -23.495), x_dir=(-0.8660254037845145, 0, 0.4999999999998685), z_dir=(0, -1, 0))) as fillet2_2_piece_33:
        with BuildLine():
            CenterArc((FILLET2_R * 0.267949192431, -FILLET2_R), FILLET2_R, 89.99999999999993, 29.999999999991388)
            Line((-FILLET2_R * 0.232050807569, -FILLET2_R * 0.133974596215), (0, 0))
            Line((0, 0), (FILLET2_R * 0.267949192431, 0))
        make_face()
    extrude(amount=3.3019999999999996, mode=Mode.SUBTRACT)
    with BuildSketch(Plane(origin=(42.03725654030968, 5.842, -23.324852262806324), x_dir=(0.4999999999998724, 0, 0.8660254037845123), z_dir=(-0.8660254037845124, 0, 0.4999999999998724))) as fillet2_2_piece_34:
        with BuildLine():
            CenterArc((FILLET2_R, -FILLET2_R), FILLET2_R, 90.00000000000004, 89.99999999999996)
            Line((-2.66e-15, -FILLET2_R), (0, 0))
            Line((0, 0), (FILLET2_R, 0))
        make_face()
    extrude(amount=18.369409051219847, mode=Mode.SUBTRACT)
    with BuildSketch(Plane(origin=(42.33196106592211, 4.571999999999999, 23.495), x_dir=(1, 0, 0), z_dir=(0, -1, 0))) as fillet2_2_piece_35:
        with BuildLine():
            CenterArc((FILLET2_R * 0.267949192431, -FILLET2_R), FILLET2_R, 90, 29.99999999999136)
            Line((-FILLET2_R * 0.232050807569, -FILLET2_R * 0.133974596215), (0, 0))
            Line((0, 0), (FILLET2_R * 0.267949192431, 0))
        make_face()
    extrude(amount=3.3019999999999996, mode=Mode.SUBTRACT)
    with BuildSketch(Plane(origin=(42.03725654030969, 0, 23.32485226280633), x_dir=(0.4999999999998724, 0, -0.8660254037845123), z_dir=(-0.8660254037845124, 0, -0.4999999999998724))) as fillet2_2_piece_36:
        with BuildLine():
            CenterArc((FILLET2_R, -FILLET2_R), FILLET2_R, 90, 90)
            Line((1.278e-14, -FILLET2_R), (0, 0))
            Line((0, 0), (FILLET2_R, 0))
        make_face()
    extrude(amount=18.369409051219865, mode=Mode.SUBTRACT)
    with BuildSketch(Plane(origin=(42.03725654030969, 5.842, 23.32485226280633), x_dir=(0.4999999999998724, 0, -0.8660254037845123), z_dir=(-0.8660254037845124, 0, -0.4999999999998724))) as fillet2_2_piece_37:
        with BuildLine():
            CenterArc((FILLET2_R, FILLET2_R), FILLET2_R, 180, 89.99999999999994)
            Line((1.367e-14, FILLET2_R), (0, 0))
            Line((0, 0), (FILLET2_R, 0))
        make_face()
    extrude(amount=18.369409051219865, mode=Mode.SUBTRACT)
    with BuildSketch(Plane(origin=(-6.997216057915747, 0, 14.140147737188594), x_dir=(-6.1e-16, 1, -1.05e-15), z_dir=(-0.8660254037842315, 0, 0.5000000000003589))) as fillet2_2_piece_38:
        with BuildLine():
            CenterArc((FILLET2_R, FILLET2_R), FILLET2_R, 179.99999999999986, 90.00000000000006)
            Line((1.32e-15, FILLET2_R), (0, 0))
            Line((0, 0), (FILLET2_R, 0))
        make_face()
    extrude(amount=18.369409051221577, mode=Mode.SUBTRACT)
    with BuildSketch(Plane(origin=(-23.200295474390288, 1.2700000000000002, 23.495000000000005), x_dir=(0.8660254037842348, 0, -0.5000000000003532), z_dir=(0, 1, 0))) as fillet2_2_piece_39:
        with BuildLine():
            CenterArc((FILLET2_R * 0.267949192431, FILLET2_R), FILLET2_R, 239.9999999999768, 30.00000000002359)
            Line((-FILLET2_R * 0.232050807569, FILLET2_R * 0.133974596216), (0, 0))
            Line((0, 0), (FILLET2_R * 0.267949192431, 0))
        make_face()
    extrude(amount=3.3019999999999987, mode=Mode.SUBTRACT)
    with BuildSketch(Plane(origin=(-6.997216057915747, 5.842, 14.140147737188594), x_dir=(-6.1e-16, -1, -1.05e-15), z_dir=(-0.8660254037842315, 0, 0.5000000000003589))) as fillet2_2_piece_40:
        with BuildLine():
            CenterArc((FILLET2_R, -FILLET2_R), FILLET2_R, 90.00000000000007, 90.00000000000006)
            Line((6.5e-16, -FILLET2_R), (0, 0))
            Line((0, 0), (FILLET2_R, 0))
        make_face()
    extrude(amount=18.369409051221577, mode=Mode.SUBTRACT)
    with BuildSketch(Plane(origin=(-6.36221605791529, 5.842, 15.239999999994568), x_dir=(-0.5000000000003596, 0, -0.866025403784231), z_dir=(-0.866025403784231, 0, 0.5000000000003596))) as fillet2_2_piece_41:
        with BuildLine():
            CenterArc((1.2699999999999994 + FILLET2_R, FILLET2_R), FILLET2_R, 180.00000000000003, 90)
            Line((1.2700000000000014, FILLET2_R), (1.2699999999999994, 0))
            Line((1.2699999999999994, 0), (1.2699999999999994 + FILLET2_R, 8.9e-16))
        make_face()
    revolve(axis=Axis((-6.36221605791529, 5.842, 15.239999999994568), (0, -1, 0)), revolution_arc=30.00000000002379, mode=Mode.SUBTRACT)
    with BuildSketch(Plane(origin=(-6.36221605791529, 0, 15.239999999994568), x_dir=(-0.5000000000003596, 0, -0.866025403784231), z_dir=(-0.866025403784231, 0, 0.5000000000003596))) as fillet2_2_piece_42:
        with BuildLine():
            CenterArc((1.2699999999999994 + FILLET2_R, -FILLET2_R), FILLET2_R, 90, 90)
            Line((1.2700000000000014, -FILLET2_R), (1.2699999999999994, 0))
            Line((1.2699999999999994, 0), (1.2699999999999994 + FILLET2_R, 0))
        make_face()
    revolve(axis=Axis((-6.36221605791529, 0, 15.239999999994568), (0, -1, 0)), revolution_arc=30.00000000002379, mode=Mode.SUBTRACT)
    with BuildSketch(Plane(origin=(25.493881649444305, 5.842, 15.24), x_dir=(0, 0, -1), z_dir=(-1, 0, 0))) as fillet2_2_piece_43:
        with BuildLine():
            CenterArc((1.2699999999999996 + FILLET2_R, FILLET2_R), FILLET2_R, 180.00000000000003, 90)
            Line((1.2700000000000014, FILLET2_R), (1.2699999999999996, 0))
            Line((1.2699999999999996, 0), (1.2699999999999996 + FILLET2_R, 8.9e-16))
        make_face()
    revolve(axis=Axis((25.493881649444305, 5.842, 15.24), (0, -1, 0)), revolution_arc=30.000000000105764, mode=Mode.SUBTRACT)
    with BuildSketch(Plane(origin=(25.493881649444305, 0, 15.24), x_dir=(0, 0, -1), z_dir=(-1, 0, 0))) as fillet2_2_piece_44:
        with BuildLine():
            CenterArc((1.2699999999999996 + FILLET2_R, -FILLET2_R), FILLET2_R, 90, 90)
            Line((1.2700000000000014, -FILLET2_R), (1.2699999999999996, 0))
            Line((1.2699999999999996, 0), (1.2699999999999996 + FILLET2_R, 0))
        make_face()
    revolve(axis=Axis((25.493881649444305, 0, 15.24), (0, -1, 0)), revolution_arc=30.000000000105764, mode=Mode.SUBTRACT)
    with BuildSketch(Plane(origin=(25.493881649444297, 5.842, -15.240000000005075), x_dir=(0.4999999999998728, 0, 0.8660254037845121), z_dir=(0.8660254037845121, 0, -0.4999999999998728))) as fillet2_2_piece_45:
        with BuildLine():
            CenterArc((1.2699999999999994 + FILLET2_R, FILLET2_R), FILLET2_R, 180.00000000000003, 90)
            Line((1.269999999999998, FILLET2_R), (1.2699999999999994, 0))
            Line((1.2699999999999994, 0), (1.2699999999999994 + FILLET2_R, 8.9e-16))
        make_face()
    revolve(axis=Axis((25.493881649444297, 5.842, -15.240000000005075), (0, -1, 0)), revolution_arc=29.99999999999143, mode=Mode.SUBTRACT)
    with BuildSketch(Plane(origin=(25.493881649444297, 0, -15.240000000005075), x_dir=(0.4999999999998728, 0, 0.8660254037845121), z_dir=(0.8660254037845121, 0, -0.4999999999998728))) as fillet2_2_piece_46:
        with BuildLine():
            CenterArc((1.2699999999999994 + FILLET2_R, -FILLET2_R), FILLET2_R, 90, 90)
            Line((1.269999999999998, -FILLET2_R), (1.2699999999999994, 0))
            Line((1.2699999999999994, 0), (1.2699999999999994 + FILLET2_R, 0))
        make_face()
    revolve(axis=Axis((25.493881649444297, 0, -15.240000000005075), (0, -1, 0)), revolution_arc=29.99999999999143, mode=Mode.SUBTRACT)
    with BuildSketch(Plane(origin=(-6.36221605791529, 5.842, -15.24), x_dir=(0, 0, 1), z_dir=(1, 0, 0))) as fillet2_2_piece_47:
        with BuildLine():
            CenterArc((1.2699999999999996 + FILLET2_R, FILLET2_R), FILLET2_R, 180.00000000000003, 90)
            Line((1.2699999999999907, FILLET2_R), (1.2699999999999996, 0))
            Line((1.2699999999999996, 0), (1.2699999999999996 + FILLET2_R, 8.9e-16))
        make_face()
    revolve(axis=Axis((-6.36221605791529, 5.842, -15.24), (0, -1, 0)), revolution_arc=29.999999999901217, mode=Mode.SUBTRACT)
    with BuildSketch(Plane(origin=(-6.36221605791529, 0, -15.24), x_dir=(0, 0, 1), z_dir=(1, 0, 0))) as fillet2_2_piece_48:
        with BuildLine():
            CenterArc((1.2699999999999996 + FILLET2_R, -FILLET2_R), FILLET2_R, 90, 90)
            Line((1.2699999999999907, -FILLET2_R), (1.2699999999999996, 0))
            Line((1.2699999999999996, 0), (1.2699999999999996 + FILLET2_R, 0))
        make_face()
    revolve(axis=Axis((-6.36221605791529, 0, -15.24), (0, -1, 0)), revolution_arc=29.999999999901217, mode=Mode.SUBTRACT)


solid = part.part
